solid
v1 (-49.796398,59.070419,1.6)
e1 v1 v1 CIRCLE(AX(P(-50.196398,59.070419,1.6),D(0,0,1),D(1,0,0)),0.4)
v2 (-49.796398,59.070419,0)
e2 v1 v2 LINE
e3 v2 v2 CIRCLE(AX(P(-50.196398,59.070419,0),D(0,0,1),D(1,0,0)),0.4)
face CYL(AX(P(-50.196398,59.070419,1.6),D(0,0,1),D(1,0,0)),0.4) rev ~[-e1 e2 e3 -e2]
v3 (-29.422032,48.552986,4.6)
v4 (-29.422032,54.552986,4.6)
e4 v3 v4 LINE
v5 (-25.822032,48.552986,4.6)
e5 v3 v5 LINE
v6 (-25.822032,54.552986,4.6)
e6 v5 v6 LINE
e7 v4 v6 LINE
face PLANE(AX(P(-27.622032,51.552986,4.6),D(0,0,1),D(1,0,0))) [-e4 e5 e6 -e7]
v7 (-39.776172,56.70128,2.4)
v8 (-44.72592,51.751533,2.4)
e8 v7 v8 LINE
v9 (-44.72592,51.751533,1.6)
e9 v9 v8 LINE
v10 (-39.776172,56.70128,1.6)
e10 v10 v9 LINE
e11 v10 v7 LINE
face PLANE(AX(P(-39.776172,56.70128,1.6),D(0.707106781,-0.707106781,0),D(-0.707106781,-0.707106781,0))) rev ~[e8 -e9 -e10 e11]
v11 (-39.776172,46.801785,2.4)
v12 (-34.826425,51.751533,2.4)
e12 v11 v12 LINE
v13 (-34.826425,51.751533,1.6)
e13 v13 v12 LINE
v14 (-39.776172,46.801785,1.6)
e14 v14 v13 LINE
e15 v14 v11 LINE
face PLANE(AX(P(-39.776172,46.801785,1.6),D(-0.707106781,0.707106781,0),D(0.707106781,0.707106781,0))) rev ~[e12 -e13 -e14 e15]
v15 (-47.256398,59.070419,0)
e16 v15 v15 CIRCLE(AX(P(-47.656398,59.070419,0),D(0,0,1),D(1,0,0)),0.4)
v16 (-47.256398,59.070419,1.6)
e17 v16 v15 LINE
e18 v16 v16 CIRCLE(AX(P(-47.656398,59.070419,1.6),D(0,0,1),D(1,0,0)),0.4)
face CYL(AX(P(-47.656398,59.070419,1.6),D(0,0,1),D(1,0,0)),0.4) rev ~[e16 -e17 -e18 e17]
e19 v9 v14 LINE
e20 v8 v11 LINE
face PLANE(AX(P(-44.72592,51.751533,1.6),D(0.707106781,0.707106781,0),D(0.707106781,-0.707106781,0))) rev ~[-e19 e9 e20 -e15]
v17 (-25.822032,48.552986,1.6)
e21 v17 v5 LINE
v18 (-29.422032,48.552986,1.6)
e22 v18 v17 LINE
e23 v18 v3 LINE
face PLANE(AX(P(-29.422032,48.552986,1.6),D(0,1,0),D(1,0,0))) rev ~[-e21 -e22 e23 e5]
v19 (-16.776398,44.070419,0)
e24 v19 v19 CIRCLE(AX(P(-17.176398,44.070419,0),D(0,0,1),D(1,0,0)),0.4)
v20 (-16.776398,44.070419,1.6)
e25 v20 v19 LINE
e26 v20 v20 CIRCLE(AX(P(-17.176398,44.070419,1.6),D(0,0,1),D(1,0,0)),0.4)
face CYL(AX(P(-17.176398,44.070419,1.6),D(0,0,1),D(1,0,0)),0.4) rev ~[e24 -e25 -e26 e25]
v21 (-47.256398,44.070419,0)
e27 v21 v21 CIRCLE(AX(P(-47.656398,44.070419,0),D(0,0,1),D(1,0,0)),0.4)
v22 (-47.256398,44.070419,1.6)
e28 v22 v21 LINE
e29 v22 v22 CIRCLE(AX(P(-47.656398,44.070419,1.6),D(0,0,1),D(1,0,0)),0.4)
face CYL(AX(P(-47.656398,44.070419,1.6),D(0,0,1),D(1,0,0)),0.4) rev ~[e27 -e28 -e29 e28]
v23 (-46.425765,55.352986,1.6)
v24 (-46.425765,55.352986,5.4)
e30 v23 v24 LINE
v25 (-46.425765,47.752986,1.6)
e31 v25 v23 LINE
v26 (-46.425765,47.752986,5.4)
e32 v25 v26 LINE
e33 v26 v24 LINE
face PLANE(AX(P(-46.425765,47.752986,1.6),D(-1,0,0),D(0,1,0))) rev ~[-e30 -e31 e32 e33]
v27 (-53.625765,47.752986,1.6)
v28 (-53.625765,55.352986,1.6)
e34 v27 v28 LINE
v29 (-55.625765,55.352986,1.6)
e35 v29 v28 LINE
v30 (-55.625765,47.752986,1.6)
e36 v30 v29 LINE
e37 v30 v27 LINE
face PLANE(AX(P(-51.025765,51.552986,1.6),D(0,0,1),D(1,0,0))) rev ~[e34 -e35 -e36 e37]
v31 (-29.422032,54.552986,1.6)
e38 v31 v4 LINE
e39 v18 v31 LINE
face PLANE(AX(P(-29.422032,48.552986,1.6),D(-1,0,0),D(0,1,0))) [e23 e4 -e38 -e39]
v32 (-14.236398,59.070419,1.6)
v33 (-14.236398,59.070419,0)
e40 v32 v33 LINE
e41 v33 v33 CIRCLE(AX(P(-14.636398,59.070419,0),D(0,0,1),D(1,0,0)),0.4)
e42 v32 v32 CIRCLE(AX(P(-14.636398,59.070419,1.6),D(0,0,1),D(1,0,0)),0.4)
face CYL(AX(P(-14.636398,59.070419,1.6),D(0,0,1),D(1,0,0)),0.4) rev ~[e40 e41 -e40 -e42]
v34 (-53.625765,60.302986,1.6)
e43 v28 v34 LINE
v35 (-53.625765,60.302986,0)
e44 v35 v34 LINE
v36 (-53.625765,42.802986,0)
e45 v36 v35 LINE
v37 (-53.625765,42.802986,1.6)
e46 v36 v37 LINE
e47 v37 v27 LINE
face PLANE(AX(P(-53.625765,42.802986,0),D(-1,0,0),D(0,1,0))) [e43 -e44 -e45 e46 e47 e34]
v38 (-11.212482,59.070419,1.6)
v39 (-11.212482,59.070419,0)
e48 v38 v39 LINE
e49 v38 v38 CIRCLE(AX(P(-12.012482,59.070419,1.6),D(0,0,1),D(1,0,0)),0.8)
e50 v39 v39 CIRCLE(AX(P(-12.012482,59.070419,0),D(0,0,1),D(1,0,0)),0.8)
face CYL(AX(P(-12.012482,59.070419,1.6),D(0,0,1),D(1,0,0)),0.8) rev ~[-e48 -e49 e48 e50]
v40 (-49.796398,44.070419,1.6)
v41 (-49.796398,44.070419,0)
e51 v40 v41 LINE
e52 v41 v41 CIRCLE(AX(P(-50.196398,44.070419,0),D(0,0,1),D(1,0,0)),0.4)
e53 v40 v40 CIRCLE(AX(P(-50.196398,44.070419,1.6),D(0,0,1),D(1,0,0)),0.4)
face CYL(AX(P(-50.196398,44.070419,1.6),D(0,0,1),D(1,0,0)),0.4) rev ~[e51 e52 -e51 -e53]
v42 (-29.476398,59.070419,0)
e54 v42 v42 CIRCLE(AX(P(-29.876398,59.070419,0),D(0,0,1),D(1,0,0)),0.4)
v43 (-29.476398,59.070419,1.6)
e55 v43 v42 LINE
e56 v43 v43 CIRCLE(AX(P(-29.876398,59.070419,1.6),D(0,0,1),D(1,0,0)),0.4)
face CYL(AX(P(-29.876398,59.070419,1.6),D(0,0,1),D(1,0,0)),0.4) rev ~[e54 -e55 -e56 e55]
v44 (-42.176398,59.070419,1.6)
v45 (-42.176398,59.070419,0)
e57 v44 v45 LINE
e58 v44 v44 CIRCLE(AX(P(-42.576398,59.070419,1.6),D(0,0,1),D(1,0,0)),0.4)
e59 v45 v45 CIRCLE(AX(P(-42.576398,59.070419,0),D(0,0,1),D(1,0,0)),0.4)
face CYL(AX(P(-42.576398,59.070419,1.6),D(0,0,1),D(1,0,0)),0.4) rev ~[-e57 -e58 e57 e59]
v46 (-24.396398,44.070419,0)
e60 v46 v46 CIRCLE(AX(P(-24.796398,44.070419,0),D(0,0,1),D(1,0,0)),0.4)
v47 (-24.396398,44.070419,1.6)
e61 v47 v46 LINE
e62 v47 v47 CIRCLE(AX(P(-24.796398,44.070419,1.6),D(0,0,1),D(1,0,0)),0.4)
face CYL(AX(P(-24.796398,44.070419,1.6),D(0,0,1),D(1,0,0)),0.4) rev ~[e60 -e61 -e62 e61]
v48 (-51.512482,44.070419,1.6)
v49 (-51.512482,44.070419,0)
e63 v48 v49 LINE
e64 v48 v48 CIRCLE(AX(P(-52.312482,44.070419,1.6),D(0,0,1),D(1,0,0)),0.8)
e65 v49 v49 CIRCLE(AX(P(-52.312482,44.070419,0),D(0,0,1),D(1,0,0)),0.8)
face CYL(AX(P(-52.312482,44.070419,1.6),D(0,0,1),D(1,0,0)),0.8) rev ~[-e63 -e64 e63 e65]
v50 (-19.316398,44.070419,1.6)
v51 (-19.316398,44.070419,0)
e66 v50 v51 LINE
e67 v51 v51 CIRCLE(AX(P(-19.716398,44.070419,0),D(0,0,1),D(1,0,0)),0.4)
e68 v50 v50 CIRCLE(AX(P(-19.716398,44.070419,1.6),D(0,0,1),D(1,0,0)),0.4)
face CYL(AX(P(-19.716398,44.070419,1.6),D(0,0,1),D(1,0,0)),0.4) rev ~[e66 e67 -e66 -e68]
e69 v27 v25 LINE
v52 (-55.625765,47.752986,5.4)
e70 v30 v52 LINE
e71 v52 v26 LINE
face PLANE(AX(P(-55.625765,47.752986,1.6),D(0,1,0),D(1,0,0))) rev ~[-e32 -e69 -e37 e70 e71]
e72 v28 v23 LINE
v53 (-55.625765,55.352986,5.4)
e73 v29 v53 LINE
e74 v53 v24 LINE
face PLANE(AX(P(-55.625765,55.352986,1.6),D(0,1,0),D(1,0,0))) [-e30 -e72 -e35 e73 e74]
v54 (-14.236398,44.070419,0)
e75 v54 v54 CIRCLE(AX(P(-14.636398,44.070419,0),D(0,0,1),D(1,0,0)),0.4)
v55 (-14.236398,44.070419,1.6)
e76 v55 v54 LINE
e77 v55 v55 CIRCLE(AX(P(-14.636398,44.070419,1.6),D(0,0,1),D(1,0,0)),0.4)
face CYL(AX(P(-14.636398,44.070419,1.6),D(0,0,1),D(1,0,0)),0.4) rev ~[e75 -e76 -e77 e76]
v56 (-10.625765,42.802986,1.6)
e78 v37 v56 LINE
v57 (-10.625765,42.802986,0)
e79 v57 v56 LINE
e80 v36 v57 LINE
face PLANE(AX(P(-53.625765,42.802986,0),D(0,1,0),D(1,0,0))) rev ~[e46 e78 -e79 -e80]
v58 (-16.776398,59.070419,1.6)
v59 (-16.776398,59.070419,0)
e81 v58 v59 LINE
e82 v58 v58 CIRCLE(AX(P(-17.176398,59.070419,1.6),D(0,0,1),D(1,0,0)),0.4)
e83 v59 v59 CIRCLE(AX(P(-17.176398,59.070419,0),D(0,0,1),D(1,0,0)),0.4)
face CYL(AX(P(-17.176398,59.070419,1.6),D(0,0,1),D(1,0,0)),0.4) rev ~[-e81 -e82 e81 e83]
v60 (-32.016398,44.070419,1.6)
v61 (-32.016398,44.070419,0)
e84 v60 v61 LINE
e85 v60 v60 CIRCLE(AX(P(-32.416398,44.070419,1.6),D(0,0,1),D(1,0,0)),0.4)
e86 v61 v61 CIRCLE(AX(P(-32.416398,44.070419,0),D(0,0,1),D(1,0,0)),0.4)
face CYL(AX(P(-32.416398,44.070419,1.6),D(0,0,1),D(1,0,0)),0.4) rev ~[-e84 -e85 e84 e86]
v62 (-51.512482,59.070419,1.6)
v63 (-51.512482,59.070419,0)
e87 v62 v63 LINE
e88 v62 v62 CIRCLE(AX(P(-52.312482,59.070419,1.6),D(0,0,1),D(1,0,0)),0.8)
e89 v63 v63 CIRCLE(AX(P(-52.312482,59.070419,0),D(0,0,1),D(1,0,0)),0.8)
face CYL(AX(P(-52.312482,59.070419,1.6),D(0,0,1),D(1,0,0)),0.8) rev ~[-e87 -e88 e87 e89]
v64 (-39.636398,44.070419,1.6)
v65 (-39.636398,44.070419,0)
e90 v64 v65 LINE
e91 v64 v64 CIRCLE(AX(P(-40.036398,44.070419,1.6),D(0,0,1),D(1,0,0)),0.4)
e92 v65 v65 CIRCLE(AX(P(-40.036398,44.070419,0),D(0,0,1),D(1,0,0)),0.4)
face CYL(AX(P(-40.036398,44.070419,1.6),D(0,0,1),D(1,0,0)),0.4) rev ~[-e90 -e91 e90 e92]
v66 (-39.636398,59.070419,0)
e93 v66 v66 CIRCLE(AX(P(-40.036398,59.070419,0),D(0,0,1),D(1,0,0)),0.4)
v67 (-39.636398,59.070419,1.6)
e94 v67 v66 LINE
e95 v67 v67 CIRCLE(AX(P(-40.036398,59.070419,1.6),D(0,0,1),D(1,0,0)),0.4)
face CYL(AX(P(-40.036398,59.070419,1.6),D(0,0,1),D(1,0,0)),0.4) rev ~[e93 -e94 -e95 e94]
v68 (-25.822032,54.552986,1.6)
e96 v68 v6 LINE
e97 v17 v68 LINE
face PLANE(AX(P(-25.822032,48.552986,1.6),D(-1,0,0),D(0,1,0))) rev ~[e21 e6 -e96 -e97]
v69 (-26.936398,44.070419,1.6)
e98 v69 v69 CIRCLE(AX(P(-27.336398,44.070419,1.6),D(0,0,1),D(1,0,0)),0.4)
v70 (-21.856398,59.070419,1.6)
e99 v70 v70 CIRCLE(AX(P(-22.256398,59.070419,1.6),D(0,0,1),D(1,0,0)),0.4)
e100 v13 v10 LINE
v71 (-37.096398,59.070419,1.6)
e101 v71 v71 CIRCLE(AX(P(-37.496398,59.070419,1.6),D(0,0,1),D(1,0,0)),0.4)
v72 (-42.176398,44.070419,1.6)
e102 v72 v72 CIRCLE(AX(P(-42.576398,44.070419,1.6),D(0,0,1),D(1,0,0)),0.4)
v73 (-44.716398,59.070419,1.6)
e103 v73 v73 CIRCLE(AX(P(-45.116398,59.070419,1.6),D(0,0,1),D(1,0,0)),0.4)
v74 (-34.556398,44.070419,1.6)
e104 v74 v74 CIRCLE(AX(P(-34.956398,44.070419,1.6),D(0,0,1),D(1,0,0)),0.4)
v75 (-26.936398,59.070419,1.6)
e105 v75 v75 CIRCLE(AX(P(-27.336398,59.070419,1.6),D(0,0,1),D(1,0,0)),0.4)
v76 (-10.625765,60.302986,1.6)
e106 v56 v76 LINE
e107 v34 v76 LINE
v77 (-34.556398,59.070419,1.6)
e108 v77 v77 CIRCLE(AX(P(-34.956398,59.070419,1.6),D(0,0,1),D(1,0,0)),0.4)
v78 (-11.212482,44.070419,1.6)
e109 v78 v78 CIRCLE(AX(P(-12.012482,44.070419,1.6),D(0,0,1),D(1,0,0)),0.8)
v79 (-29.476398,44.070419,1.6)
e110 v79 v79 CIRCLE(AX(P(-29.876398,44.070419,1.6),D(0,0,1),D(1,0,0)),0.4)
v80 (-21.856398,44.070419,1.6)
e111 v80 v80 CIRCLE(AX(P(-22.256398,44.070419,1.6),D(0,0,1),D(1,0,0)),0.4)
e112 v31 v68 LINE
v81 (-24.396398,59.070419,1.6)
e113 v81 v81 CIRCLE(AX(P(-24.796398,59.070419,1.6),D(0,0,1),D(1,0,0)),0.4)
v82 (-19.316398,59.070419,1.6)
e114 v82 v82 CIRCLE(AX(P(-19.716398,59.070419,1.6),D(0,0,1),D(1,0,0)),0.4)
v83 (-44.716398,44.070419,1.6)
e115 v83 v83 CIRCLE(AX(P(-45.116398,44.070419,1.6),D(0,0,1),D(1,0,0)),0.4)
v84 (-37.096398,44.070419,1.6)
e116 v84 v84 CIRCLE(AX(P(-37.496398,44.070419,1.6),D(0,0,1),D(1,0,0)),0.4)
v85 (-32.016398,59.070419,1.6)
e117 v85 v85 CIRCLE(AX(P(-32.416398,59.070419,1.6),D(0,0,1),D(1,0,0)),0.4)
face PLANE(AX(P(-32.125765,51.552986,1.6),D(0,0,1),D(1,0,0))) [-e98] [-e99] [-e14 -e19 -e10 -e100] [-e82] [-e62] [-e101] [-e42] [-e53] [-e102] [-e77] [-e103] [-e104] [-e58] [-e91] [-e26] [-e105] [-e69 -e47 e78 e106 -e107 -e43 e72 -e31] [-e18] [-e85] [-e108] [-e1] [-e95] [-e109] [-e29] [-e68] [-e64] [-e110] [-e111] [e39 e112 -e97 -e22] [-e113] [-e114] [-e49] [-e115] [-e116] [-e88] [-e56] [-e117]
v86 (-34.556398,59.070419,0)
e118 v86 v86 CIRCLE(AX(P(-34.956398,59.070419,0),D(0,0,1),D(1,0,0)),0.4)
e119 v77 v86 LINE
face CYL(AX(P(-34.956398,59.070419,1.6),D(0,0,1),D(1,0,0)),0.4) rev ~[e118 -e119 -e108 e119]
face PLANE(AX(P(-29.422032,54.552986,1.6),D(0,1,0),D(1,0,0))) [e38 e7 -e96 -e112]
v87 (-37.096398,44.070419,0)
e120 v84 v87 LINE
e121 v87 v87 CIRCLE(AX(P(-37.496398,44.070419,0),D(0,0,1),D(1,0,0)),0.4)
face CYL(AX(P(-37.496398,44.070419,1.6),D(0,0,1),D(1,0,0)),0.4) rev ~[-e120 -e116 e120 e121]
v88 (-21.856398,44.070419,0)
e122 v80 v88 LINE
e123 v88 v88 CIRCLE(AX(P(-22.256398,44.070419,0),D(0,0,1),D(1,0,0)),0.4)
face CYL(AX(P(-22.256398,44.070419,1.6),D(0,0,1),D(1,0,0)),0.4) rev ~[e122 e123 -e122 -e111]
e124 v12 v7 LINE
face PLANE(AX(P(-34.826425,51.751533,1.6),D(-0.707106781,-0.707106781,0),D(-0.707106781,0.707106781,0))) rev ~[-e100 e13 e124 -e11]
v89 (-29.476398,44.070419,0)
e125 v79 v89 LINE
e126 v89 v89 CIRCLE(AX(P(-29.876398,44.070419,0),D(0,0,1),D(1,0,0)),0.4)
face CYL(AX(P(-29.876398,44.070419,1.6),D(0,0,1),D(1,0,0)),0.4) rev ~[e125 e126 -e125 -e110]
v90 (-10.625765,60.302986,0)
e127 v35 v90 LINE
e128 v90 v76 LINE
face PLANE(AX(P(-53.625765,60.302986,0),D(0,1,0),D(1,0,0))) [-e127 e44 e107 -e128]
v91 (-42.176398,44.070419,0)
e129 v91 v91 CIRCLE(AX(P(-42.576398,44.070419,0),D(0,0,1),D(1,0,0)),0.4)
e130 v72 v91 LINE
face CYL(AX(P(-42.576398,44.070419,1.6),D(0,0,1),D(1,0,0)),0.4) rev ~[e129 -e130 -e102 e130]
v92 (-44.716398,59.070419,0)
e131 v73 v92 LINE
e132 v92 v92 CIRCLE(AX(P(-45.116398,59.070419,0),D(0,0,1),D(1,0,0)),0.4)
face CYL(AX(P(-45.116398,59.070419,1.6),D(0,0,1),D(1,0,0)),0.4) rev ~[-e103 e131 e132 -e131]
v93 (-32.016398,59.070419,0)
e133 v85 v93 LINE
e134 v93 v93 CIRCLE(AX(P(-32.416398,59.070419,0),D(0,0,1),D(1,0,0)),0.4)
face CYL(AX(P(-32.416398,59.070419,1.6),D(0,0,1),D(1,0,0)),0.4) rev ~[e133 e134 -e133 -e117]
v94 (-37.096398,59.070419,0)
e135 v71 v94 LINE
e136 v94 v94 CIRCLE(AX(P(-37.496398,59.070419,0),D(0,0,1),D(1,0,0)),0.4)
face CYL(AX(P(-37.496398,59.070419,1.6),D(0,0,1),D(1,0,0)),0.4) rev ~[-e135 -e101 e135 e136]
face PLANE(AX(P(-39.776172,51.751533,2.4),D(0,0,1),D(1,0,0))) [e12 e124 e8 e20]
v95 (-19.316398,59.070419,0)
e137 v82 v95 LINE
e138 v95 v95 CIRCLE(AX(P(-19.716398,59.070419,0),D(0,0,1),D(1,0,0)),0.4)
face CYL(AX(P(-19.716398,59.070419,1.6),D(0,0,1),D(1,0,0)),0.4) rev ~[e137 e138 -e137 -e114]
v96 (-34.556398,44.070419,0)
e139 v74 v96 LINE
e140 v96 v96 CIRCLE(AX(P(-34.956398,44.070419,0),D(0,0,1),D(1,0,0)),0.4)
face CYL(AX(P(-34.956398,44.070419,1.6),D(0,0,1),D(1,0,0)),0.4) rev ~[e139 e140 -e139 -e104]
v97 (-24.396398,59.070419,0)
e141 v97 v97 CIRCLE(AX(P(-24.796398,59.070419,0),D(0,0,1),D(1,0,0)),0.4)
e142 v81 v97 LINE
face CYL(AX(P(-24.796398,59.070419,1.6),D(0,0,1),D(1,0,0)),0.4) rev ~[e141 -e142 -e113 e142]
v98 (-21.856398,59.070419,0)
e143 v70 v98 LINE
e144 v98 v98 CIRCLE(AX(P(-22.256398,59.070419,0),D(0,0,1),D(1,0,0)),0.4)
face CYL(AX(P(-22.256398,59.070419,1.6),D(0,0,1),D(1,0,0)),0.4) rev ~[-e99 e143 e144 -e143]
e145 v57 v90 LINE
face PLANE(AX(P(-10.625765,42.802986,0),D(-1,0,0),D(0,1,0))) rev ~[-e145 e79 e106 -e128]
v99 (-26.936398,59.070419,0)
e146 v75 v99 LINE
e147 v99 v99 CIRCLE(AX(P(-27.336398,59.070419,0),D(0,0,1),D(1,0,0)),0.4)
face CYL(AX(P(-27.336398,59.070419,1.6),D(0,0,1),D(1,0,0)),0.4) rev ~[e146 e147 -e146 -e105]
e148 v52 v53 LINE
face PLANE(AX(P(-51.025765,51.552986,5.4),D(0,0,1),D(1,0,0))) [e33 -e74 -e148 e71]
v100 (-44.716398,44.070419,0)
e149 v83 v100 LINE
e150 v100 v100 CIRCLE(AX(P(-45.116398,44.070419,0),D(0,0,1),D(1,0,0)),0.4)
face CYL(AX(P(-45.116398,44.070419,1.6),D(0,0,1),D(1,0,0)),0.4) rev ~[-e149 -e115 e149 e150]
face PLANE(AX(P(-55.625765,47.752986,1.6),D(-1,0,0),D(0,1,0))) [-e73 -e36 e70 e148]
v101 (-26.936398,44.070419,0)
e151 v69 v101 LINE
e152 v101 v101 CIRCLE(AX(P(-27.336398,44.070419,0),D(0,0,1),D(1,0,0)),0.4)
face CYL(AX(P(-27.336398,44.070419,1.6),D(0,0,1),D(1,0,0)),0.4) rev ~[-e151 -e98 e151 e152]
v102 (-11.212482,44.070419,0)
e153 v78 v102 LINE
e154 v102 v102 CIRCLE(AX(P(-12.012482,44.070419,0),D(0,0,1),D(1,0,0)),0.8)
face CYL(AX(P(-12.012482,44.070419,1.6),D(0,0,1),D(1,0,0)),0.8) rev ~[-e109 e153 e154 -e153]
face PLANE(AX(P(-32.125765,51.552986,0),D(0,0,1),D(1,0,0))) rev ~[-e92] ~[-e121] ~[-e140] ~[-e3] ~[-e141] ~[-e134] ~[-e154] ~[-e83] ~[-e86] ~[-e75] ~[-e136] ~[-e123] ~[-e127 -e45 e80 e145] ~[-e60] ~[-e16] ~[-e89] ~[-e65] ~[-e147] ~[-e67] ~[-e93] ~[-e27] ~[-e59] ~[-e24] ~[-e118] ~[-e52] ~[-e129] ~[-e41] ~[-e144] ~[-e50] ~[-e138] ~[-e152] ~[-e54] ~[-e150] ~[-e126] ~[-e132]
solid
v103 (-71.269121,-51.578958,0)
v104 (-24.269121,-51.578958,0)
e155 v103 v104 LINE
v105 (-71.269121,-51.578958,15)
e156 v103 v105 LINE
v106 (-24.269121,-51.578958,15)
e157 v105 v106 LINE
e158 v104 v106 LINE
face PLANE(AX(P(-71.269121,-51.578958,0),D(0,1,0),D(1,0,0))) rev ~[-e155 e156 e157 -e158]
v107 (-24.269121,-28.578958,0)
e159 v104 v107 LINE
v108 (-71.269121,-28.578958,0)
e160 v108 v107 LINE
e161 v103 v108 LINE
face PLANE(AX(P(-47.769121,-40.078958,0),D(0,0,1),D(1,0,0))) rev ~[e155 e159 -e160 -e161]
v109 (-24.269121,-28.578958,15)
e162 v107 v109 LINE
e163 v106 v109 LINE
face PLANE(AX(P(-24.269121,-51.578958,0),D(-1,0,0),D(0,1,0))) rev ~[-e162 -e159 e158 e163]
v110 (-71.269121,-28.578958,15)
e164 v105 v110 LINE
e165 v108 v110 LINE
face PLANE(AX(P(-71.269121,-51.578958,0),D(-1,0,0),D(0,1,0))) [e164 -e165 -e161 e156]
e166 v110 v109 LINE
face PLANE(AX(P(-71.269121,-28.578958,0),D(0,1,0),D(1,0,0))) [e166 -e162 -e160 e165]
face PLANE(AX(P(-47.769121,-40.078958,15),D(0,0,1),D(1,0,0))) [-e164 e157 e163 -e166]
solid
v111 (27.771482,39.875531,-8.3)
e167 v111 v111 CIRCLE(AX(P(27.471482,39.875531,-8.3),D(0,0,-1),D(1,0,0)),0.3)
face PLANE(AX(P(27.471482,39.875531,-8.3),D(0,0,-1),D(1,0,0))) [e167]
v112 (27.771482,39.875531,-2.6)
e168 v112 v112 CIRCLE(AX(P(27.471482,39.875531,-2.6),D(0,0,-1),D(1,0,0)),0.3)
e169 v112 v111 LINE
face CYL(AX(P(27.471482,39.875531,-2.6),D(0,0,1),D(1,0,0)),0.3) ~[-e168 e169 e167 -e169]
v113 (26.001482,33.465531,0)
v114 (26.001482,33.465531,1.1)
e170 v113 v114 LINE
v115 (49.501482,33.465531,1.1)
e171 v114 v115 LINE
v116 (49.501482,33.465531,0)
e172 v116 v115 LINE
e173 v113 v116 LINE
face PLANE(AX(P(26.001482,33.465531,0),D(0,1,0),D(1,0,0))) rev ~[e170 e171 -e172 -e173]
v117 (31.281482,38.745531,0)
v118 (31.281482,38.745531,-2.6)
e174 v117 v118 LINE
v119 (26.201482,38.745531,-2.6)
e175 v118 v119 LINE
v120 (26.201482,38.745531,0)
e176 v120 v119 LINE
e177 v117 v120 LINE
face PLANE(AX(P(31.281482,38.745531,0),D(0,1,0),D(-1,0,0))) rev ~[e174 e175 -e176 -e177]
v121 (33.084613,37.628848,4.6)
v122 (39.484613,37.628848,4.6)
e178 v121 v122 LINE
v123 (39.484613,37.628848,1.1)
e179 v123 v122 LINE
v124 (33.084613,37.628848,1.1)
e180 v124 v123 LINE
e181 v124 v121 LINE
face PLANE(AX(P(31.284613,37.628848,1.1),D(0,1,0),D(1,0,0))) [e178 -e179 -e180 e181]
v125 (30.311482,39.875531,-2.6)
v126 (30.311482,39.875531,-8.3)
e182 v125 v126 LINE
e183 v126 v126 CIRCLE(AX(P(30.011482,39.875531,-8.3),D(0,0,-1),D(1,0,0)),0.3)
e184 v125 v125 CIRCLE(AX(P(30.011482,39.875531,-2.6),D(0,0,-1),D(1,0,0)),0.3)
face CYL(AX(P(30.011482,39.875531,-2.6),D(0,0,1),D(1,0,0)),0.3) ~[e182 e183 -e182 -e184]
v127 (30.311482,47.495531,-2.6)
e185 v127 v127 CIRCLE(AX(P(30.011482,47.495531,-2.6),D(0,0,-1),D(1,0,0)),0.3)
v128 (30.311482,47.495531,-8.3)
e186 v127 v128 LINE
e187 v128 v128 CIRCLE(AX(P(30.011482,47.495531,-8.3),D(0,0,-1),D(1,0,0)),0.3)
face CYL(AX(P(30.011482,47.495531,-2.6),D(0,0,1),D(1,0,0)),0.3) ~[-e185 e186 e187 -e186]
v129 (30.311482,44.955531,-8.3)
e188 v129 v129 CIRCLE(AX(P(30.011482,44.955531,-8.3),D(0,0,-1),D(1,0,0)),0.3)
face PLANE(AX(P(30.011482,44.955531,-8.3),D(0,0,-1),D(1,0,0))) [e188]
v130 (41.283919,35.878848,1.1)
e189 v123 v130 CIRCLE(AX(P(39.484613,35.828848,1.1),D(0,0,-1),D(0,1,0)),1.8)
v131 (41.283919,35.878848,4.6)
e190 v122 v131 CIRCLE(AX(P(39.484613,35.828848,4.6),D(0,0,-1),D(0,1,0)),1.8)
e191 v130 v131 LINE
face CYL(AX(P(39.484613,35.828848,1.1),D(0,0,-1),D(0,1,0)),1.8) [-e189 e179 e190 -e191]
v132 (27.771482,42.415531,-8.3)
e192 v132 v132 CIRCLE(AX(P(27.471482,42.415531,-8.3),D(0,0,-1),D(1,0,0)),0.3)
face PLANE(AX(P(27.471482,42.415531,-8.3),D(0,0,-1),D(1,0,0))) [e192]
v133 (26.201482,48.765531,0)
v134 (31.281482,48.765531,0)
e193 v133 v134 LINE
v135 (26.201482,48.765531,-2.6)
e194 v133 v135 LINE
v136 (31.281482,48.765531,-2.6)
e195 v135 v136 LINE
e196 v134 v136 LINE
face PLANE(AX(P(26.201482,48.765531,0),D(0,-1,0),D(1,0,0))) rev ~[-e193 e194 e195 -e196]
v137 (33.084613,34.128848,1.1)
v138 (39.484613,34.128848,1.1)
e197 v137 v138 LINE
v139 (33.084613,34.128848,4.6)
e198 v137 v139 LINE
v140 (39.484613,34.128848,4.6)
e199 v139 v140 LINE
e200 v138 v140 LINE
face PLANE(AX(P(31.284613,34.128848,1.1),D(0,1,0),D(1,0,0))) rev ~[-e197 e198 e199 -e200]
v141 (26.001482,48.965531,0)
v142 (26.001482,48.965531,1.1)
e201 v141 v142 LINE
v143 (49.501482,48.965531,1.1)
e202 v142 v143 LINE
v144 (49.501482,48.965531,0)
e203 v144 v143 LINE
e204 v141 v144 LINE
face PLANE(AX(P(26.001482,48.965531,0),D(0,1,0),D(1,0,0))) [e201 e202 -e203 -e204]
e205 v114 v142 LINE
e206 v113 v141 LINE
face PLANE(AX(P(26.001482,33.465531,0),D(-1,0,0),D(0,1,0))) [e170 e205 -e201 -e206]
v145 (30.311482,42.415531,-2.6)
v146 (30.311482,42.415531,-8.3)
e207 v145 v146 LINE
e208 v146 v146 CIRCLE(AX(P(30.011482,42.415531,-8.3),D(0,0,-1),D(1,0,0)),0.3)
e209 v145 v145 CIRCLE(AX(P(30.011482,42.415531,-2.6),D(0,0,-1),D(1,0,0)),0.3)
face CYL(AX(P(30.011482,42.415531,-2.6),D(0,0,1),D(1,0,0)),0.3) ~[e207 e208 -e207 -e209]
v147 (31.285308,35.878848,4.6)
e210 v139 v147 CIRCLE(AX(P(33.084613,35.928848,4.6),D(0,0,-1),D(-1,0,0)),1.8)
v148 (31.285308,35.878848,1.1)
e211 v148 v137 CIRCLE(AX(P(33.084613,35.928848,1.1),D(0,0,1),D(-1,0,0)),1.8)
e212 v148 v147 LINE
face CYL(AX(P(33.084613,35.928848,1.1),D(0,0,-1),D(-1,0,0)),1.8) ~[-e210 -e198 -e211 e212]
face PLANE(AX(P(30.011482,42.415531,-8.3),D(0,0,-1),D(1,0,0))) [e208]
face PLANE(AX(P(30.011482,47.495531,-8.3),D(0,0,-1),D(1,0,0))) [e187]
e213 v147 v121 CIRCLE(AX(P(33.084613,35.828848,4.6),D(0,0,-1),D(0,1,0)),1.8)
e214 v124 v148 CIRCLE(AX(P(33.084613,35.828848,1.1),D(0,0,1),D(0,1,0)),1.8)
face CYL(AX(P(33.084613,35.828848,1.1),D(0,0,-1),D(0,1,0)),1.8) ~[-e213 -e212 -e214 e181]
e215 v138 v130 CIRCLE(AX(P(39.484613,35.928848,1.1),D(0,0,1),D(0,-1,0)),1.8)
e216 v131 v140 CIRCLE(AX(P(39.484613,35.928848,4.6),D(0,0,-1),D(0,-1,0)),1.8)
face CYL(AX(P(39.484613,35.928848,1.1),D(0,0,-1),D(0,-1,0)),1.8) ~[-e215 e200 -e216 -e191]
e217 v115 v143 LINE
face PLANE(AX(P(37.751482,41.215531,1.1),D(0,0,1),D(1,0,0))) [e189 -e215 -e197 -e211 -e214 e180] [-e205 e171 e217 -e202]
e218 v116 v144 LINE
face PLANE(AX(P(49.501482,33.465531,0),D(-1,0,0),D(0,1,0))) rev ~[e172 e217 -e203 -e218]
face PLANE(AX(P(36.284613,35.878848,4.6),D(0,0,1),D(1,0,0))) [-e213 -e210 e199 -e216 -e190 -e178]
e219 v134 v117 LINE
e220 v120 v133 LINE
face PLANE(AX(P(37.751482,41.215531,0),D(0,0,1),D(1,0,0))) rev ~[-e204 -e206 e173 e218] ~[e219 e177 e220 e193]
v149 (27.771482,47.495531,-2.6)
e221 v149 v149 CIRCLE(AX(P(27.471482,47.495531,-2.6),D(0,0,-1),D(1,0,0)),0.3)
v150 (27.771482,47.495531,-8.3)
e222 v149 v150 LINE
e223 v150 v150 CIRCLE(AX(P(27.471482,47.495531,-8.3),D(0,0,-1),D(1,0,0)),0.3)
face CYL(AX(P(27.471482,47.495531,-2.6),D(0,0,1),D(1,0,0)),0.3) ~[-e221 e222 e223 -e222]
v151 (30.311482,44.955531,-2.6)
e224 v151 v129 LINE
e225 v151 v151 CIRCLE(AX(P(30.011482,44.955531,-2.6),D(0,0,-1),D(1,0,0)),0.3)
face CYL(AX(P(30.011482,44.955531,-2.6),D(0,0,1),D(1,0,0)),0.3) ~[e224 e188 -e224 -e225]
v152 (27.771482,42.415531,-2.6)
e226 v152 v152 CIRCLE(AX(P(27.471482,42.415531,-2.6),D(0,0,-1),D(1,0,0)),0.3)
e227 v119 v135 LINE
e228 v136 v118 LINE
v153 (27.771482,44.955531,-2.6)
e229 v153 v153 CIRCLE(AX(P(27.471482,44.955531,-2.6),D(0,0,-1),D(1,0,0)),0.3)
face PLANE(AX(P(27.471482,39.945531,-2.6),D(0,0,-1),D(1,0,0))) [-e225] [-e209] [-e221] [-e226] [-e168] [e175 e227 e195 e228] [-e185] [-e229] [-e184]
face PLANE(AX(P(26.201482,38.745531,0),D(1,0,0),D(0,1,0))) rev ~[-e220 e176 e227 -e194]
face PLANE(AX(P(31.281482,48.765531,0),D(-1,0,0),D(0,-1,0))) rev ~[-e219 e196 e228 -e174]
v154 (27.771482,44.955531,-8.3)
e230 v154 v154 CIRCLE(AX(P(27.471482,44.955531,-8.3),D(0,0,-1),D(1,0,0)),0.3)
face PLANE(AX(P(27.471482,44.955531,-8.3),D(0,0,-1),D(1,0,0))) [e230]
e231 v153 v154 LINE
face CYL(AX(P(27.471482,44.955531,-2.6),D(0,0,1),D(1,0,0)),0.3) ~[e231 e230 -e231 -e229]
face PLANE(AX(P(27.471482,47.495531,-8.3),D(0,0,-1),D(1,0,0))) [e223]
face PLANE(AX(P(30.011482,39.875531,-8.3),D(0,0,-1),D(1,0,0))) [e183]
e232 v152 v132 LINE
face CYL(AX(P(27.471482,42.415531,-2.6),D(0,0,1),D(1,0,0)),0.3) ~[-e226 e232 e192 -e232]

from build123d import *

# Parameters (mm, degrees)
F0_W         = 43
F0_H         = 17.5
F1_DEPTH     = 1.6
F2_R         = 0.8
F3_DEPTH     = 1.6
F4_R         = 0.4
F5_DEPTH     = 1.6
F6_W         = 9.2
F6_H         = 7.6
F7_DEPTH     = 3.8
F9_DEPTH     = 0.8
F10_W        = 3.6
F10_H        = 6
F11_DEPTH    = 3
F12_W        = 23.5
F12_H        = 15.5
F13_DEPTH    = 1.1
F14_W        = 10
F14_H        = 3.5
F15_DEPTH    = 3.5
F16_T1_DEPTH = 8
F17_W        = 2.54
F17_H        = 2.4
F17_H_2      = 0.14
F17_H_3      = 2.54
F18_DEPTH    = 2.6
F19_R        = 0.3
F20_DEPTH    = 5.7
F21_W        = 47
F21_H        = 23
F22_DEPTH    = 15


# Not quite as in the source:
# - a fillet or chamfer that OpenCascade refuses, or shapes differently, is made with other operations: its cross-section is extruded or revolved along the edge and cut away or added


with BuildPart() as f1:
    # F0 (on Top) → F1 (new body)
    with BuildSketch(Plane.XY):
        with Locations((-32.1257647276, 51.5529857576)):
            Rectangle(F0_W, F0_H)
    extrude(amount=F1_DEPTH)

    # F2 (on face) → F3 (cut, through all)
    with BuildSketch(Plane.XY.offset(1.6)):
        with Locations((-52.312482166, 59.0704187174)):
            Circle(F2_R)
        with Locations((-12.012482166, 59.0704187174)):
            Circle(F2_R)
        with Locations((-52.312482166, 44.0704187174)):
            Circle(F2_R)
        with Locations((-12.012482166, 44.0704187174)):
            Circle(F2_R)
    extrude(amount=-F3_DEPTH, mode=Mode.SUBTRACT)

    # F4 (on face) → F5 (cut, through all)
    with BuildSketch(Plane.XY.offset(1.6)):
        with Locations((-50.1963980496, 59.0704187174)):
            Circle(F4_R)
        with Locations((-47.6563980496, 59.0704187174)):
            Circle(F4_R)
        with Locations((-45.1163980496, 59.0704187174)):
            Circle(F4_R)
        with Locations((-42.5763980496, 59.0704187174)):
            Circle(F4_R)
        with Locations((-40.0363980496, 59.0704187174)):
            Circle(F4_R)
        with Locations((-37.4963980496, 59.0704187174)):
            Circle(F4_R)
        with Locations((-34.9563980496, 59.0704187174)):
            Circle(F4_R)
        with Locations((-32.4163980496, 59.0704187174)):
            Circle(F4_R)
        with Locations((-29.8763980496, 59.0704187174)):
            Circle(F4_R)
        with Locations((-27.3363980496, 59.0704187174)):
            Circle(F4_R)
        with Locations((-24.7963980496, 59.0704187174)):
            Circle(F4_R)
        with Locations((-22.2563980496, 59.0704187174)):
            Circle(F4_R)
        with Locations((-19.7163980496, 59.0704187174)):
            Circle(F4_R)
        with Locations((-17.1763980496, 59.0704187174)):
            Circle(F4_R)
        with Locations((-14.6363980496, 59.0704187174)):
            Circle(F4_R)
        with Locations((-50.1963980496, 44.0704187174)):
            Circle(F4_R)
        with Locations((-47.6563980496, 44.0704187174)):
            Circle(F4_R)
        with Locations((-45.1163980496, 44.0704187174)):
            Circle(F4_R)
        with Locations((-42.5763980496, 44.0704187174)):
            Circle(F4_R)
        with Locations((-40.0363980496, 44.0704187174)):
            Circle(F4_R)
        with Locations((-37.4963980496, 44.0704187174)):
            Circle(F4_R)
        with Locations((-34.9563980496, 44.0704187174)):
            Circle(F4_R)
        with Locations((-32.4163980496, 44.0704187174)):
            Circle(F4_R)
        with Locations((-29.8763980496, 44.0704187174)):
            Circle(F4_R)
        with Locations((-27.3363980496, 44.0704187174)):
            Circle(F4_R)
        with Locations((-24.7963980496, 44.0704187174)):
            Circle(F4_R)
        with Locations((-22.2563980496, 44.0704187174)):
            Circle(F4_R)
        with Locations((-19.7163980496, 44.0704187174)):
            Circle(F4_R)
        with Locations((-17.1763980496, 44.0704187174)):
            Circle(F4_R)
        with Locations((-14.6363980496, 44.0704187174)):
            Circle(F4_R)
    extrude(amount=-F5_DEPTH, mode=Mode.SUBTRACT)

    # F6 (on face) → F7 (join)
    with BuildSketch(Plane.XY.offset(1.6)):
        with Locations((-51.0257647276, 51.5529857576)):
            Rectangle(F6_W, F6_H)
    extrude(amount=F7_DEPTH)

    # F8 (on face) → F9 (join)
    with BuildSketch(Plane.XY.offset(1.6)):
        Polygon((-34.8264250206, 51.7515327083), (-39.7761724889, 56.7012801766), (-44.7259199572, 51.7515327083), (-39.7761724889, 46.80178524), align=None)
    extrude(amount=F9_DEPTH)

    # F10 (on face) → F11 (join)
    with BuildSketch(Plane.XY.offset(1.6)):
        with Locations((-27.622032243, 51.5529857576)):
            Rectangle(F10_W, F10_H)
    extrude(amount=F11_DEPTH)


with BuildPart() as f13:
    # F12 (on Top) → F13 (new body)
    with BuildSketch(Plane.XY):
        with Locations((37.7514823973, 41.2155307233)):
            Rectangle(F12_W, F12_H)
    extrude(amount=F13_DEPTH)

    # F14 (on face) → F15 (join)
    with BuildSketch(Plane.XY.offset(1.1)):
        with Locations((36.2846133113, 35.8788484633)):
            Rectangle(F14_W, F14_H)
    extrude(amount=F15_DEPTH)

    # F16: fillet of radius 1.8 on 4 edges, made by hand

    # F16_s2 → F16_t1 (cut)
    with BuildSketch(Plane.XY.offset(1.1)):
        with BuildLine():
            ThreePointArc((31.2846133113, 35.9288484633), (31.8118211052, 34.6560562572), (33.0846133113, 34.1288484633))
            Line((33.0846133113, 34.1288484633), (31.2846133113, 34.1288484633))
            Line((31.2846133113, 34.1288484633), (31.2846133113, 35.9288484633))
        make_face()
        with BuildLine():
            ThreePointArc((33.0846133113, 37.6288484633), (31.8118211052, 37.1016406694), (31.2846133113, 35.8288484633))
            Line((31.2846133113, 35.8288484633), (31.2846133113, 37.6288484633))
            Line((31.2846133113, 37.6288484633), (33.0846133113, 37.6288484633))
        make_face()
        with BuildLine():
            ThreePointArc((39.4846133113, 37.6288484633), (40.7574055174, 37.1016406694), (41.2846133113, 35.8288484633))
            Line((41.2846133113, 35.8288484633), (41.2846133113, 37.6288484633))
            Line((41.2846133113, 37.6288484633), (39.4846133113, 37.6288484633))
        make_face()
        with BuildLine():
            ThreePointArc((39.4846133113, 34.1288484633), (40.7574055174, 34.6560562572), (41.2846133113, 35.9288484633))
            Line((41.2846133113, 35.9288484633), (41.2846133113, 34.1288484633))
            Line((41.2846133113, 34.1288484633), (39.4846133113, 34.1288484633))
        make_face()
    extrude(amount=F16_T1_DEPTH, mode=Mode.SUBTRACT)

    # F17 (on face) → F18 (join)
    with BuildSketch(Plane(origin=(0, 0, 0), x_dir=(1, 0, 0), z_dir=(0, 0, -1))):
        with Locations((27.4714823973, -39.9455307233)):
            Rectangle(F17_W, F17_H)
        with Locations((30.0114823973, -39.9455307233)):
            Rectangle(F17_W, F17_H)
        Polygon((28.7414823973, -41.1455307233), (26.2014823973, -41.1455307233), (26.2014823973, -43.6855307233), (28.7414823973, -43.6855307233), (28.7414823973, -41.2855307233), align=None)
        with Locations((30.0114823973, -41.2155307233)):
            Rectangle(F17_W, F17_H_2)
        with Locations((27.4714823973, -44.9555307233)):
            Rectangle(F17_W, F17_H_3)
        with Locations((30.0114823973, -42.4855307233)):
            Rectangle(F17_W, F17_H)
        with Locations((30.0114823973, -44.9555307233)):
            Rectangle(F17_W, F17_H_3)
        with Locations((27.4714823973, -47.4955307233)):
            Rectangle(F17_W, F17_H_3)
        with Locations((30.0114823973, -47.4955307233)):
            Rectangle(F17_W, F17_H_3)
    extrude(amount=F18_DEPTH)

    # F19 (on face) → F20 (join)
    with BuildSketch(Plane(origin=(0, 0, -2.6), x_dir=(1, 0, 0), z_dir=(0, 0, -1))):
        with Locations((27.4714823973, -47.4955307233)):
            Circle(F19_R)
        with Locations((27.4714823973, -44.9555307233)):
            Circle(F19_R)
        with Locations((27.4714823973, -42.4155307233)):
            Circle(F19_R)
        with Locations((27.4714823973, -39.8755307233)):
            Circle(F19_R)
        with Locations((30.0114823973, -47.4955307233)):
            Circle(F19_R)
        with Locations((30.0114823973, -44.9555307233)):
            Circle(F19_R)
        with Locations((30.0114823973, -42.4155307233)):
            Circle(F19_R)
        with Locations((30.0114823973, -39.8755307233)):
            Circle(F19_R)
    extrude(amount=F20_DEPTH)


with BuildPart() as f22:
    # F21 (on Top) → F22 (new body)
    with BuildSketch(Plane.XY):
        with Locations((-47.7691207677, -40.0789575875)):
            Rectangle(F21_W, F21_H)
    extrude(amount=F22_DEPTH)


solid = Compound([f1.part, f13.part, f22.part])
